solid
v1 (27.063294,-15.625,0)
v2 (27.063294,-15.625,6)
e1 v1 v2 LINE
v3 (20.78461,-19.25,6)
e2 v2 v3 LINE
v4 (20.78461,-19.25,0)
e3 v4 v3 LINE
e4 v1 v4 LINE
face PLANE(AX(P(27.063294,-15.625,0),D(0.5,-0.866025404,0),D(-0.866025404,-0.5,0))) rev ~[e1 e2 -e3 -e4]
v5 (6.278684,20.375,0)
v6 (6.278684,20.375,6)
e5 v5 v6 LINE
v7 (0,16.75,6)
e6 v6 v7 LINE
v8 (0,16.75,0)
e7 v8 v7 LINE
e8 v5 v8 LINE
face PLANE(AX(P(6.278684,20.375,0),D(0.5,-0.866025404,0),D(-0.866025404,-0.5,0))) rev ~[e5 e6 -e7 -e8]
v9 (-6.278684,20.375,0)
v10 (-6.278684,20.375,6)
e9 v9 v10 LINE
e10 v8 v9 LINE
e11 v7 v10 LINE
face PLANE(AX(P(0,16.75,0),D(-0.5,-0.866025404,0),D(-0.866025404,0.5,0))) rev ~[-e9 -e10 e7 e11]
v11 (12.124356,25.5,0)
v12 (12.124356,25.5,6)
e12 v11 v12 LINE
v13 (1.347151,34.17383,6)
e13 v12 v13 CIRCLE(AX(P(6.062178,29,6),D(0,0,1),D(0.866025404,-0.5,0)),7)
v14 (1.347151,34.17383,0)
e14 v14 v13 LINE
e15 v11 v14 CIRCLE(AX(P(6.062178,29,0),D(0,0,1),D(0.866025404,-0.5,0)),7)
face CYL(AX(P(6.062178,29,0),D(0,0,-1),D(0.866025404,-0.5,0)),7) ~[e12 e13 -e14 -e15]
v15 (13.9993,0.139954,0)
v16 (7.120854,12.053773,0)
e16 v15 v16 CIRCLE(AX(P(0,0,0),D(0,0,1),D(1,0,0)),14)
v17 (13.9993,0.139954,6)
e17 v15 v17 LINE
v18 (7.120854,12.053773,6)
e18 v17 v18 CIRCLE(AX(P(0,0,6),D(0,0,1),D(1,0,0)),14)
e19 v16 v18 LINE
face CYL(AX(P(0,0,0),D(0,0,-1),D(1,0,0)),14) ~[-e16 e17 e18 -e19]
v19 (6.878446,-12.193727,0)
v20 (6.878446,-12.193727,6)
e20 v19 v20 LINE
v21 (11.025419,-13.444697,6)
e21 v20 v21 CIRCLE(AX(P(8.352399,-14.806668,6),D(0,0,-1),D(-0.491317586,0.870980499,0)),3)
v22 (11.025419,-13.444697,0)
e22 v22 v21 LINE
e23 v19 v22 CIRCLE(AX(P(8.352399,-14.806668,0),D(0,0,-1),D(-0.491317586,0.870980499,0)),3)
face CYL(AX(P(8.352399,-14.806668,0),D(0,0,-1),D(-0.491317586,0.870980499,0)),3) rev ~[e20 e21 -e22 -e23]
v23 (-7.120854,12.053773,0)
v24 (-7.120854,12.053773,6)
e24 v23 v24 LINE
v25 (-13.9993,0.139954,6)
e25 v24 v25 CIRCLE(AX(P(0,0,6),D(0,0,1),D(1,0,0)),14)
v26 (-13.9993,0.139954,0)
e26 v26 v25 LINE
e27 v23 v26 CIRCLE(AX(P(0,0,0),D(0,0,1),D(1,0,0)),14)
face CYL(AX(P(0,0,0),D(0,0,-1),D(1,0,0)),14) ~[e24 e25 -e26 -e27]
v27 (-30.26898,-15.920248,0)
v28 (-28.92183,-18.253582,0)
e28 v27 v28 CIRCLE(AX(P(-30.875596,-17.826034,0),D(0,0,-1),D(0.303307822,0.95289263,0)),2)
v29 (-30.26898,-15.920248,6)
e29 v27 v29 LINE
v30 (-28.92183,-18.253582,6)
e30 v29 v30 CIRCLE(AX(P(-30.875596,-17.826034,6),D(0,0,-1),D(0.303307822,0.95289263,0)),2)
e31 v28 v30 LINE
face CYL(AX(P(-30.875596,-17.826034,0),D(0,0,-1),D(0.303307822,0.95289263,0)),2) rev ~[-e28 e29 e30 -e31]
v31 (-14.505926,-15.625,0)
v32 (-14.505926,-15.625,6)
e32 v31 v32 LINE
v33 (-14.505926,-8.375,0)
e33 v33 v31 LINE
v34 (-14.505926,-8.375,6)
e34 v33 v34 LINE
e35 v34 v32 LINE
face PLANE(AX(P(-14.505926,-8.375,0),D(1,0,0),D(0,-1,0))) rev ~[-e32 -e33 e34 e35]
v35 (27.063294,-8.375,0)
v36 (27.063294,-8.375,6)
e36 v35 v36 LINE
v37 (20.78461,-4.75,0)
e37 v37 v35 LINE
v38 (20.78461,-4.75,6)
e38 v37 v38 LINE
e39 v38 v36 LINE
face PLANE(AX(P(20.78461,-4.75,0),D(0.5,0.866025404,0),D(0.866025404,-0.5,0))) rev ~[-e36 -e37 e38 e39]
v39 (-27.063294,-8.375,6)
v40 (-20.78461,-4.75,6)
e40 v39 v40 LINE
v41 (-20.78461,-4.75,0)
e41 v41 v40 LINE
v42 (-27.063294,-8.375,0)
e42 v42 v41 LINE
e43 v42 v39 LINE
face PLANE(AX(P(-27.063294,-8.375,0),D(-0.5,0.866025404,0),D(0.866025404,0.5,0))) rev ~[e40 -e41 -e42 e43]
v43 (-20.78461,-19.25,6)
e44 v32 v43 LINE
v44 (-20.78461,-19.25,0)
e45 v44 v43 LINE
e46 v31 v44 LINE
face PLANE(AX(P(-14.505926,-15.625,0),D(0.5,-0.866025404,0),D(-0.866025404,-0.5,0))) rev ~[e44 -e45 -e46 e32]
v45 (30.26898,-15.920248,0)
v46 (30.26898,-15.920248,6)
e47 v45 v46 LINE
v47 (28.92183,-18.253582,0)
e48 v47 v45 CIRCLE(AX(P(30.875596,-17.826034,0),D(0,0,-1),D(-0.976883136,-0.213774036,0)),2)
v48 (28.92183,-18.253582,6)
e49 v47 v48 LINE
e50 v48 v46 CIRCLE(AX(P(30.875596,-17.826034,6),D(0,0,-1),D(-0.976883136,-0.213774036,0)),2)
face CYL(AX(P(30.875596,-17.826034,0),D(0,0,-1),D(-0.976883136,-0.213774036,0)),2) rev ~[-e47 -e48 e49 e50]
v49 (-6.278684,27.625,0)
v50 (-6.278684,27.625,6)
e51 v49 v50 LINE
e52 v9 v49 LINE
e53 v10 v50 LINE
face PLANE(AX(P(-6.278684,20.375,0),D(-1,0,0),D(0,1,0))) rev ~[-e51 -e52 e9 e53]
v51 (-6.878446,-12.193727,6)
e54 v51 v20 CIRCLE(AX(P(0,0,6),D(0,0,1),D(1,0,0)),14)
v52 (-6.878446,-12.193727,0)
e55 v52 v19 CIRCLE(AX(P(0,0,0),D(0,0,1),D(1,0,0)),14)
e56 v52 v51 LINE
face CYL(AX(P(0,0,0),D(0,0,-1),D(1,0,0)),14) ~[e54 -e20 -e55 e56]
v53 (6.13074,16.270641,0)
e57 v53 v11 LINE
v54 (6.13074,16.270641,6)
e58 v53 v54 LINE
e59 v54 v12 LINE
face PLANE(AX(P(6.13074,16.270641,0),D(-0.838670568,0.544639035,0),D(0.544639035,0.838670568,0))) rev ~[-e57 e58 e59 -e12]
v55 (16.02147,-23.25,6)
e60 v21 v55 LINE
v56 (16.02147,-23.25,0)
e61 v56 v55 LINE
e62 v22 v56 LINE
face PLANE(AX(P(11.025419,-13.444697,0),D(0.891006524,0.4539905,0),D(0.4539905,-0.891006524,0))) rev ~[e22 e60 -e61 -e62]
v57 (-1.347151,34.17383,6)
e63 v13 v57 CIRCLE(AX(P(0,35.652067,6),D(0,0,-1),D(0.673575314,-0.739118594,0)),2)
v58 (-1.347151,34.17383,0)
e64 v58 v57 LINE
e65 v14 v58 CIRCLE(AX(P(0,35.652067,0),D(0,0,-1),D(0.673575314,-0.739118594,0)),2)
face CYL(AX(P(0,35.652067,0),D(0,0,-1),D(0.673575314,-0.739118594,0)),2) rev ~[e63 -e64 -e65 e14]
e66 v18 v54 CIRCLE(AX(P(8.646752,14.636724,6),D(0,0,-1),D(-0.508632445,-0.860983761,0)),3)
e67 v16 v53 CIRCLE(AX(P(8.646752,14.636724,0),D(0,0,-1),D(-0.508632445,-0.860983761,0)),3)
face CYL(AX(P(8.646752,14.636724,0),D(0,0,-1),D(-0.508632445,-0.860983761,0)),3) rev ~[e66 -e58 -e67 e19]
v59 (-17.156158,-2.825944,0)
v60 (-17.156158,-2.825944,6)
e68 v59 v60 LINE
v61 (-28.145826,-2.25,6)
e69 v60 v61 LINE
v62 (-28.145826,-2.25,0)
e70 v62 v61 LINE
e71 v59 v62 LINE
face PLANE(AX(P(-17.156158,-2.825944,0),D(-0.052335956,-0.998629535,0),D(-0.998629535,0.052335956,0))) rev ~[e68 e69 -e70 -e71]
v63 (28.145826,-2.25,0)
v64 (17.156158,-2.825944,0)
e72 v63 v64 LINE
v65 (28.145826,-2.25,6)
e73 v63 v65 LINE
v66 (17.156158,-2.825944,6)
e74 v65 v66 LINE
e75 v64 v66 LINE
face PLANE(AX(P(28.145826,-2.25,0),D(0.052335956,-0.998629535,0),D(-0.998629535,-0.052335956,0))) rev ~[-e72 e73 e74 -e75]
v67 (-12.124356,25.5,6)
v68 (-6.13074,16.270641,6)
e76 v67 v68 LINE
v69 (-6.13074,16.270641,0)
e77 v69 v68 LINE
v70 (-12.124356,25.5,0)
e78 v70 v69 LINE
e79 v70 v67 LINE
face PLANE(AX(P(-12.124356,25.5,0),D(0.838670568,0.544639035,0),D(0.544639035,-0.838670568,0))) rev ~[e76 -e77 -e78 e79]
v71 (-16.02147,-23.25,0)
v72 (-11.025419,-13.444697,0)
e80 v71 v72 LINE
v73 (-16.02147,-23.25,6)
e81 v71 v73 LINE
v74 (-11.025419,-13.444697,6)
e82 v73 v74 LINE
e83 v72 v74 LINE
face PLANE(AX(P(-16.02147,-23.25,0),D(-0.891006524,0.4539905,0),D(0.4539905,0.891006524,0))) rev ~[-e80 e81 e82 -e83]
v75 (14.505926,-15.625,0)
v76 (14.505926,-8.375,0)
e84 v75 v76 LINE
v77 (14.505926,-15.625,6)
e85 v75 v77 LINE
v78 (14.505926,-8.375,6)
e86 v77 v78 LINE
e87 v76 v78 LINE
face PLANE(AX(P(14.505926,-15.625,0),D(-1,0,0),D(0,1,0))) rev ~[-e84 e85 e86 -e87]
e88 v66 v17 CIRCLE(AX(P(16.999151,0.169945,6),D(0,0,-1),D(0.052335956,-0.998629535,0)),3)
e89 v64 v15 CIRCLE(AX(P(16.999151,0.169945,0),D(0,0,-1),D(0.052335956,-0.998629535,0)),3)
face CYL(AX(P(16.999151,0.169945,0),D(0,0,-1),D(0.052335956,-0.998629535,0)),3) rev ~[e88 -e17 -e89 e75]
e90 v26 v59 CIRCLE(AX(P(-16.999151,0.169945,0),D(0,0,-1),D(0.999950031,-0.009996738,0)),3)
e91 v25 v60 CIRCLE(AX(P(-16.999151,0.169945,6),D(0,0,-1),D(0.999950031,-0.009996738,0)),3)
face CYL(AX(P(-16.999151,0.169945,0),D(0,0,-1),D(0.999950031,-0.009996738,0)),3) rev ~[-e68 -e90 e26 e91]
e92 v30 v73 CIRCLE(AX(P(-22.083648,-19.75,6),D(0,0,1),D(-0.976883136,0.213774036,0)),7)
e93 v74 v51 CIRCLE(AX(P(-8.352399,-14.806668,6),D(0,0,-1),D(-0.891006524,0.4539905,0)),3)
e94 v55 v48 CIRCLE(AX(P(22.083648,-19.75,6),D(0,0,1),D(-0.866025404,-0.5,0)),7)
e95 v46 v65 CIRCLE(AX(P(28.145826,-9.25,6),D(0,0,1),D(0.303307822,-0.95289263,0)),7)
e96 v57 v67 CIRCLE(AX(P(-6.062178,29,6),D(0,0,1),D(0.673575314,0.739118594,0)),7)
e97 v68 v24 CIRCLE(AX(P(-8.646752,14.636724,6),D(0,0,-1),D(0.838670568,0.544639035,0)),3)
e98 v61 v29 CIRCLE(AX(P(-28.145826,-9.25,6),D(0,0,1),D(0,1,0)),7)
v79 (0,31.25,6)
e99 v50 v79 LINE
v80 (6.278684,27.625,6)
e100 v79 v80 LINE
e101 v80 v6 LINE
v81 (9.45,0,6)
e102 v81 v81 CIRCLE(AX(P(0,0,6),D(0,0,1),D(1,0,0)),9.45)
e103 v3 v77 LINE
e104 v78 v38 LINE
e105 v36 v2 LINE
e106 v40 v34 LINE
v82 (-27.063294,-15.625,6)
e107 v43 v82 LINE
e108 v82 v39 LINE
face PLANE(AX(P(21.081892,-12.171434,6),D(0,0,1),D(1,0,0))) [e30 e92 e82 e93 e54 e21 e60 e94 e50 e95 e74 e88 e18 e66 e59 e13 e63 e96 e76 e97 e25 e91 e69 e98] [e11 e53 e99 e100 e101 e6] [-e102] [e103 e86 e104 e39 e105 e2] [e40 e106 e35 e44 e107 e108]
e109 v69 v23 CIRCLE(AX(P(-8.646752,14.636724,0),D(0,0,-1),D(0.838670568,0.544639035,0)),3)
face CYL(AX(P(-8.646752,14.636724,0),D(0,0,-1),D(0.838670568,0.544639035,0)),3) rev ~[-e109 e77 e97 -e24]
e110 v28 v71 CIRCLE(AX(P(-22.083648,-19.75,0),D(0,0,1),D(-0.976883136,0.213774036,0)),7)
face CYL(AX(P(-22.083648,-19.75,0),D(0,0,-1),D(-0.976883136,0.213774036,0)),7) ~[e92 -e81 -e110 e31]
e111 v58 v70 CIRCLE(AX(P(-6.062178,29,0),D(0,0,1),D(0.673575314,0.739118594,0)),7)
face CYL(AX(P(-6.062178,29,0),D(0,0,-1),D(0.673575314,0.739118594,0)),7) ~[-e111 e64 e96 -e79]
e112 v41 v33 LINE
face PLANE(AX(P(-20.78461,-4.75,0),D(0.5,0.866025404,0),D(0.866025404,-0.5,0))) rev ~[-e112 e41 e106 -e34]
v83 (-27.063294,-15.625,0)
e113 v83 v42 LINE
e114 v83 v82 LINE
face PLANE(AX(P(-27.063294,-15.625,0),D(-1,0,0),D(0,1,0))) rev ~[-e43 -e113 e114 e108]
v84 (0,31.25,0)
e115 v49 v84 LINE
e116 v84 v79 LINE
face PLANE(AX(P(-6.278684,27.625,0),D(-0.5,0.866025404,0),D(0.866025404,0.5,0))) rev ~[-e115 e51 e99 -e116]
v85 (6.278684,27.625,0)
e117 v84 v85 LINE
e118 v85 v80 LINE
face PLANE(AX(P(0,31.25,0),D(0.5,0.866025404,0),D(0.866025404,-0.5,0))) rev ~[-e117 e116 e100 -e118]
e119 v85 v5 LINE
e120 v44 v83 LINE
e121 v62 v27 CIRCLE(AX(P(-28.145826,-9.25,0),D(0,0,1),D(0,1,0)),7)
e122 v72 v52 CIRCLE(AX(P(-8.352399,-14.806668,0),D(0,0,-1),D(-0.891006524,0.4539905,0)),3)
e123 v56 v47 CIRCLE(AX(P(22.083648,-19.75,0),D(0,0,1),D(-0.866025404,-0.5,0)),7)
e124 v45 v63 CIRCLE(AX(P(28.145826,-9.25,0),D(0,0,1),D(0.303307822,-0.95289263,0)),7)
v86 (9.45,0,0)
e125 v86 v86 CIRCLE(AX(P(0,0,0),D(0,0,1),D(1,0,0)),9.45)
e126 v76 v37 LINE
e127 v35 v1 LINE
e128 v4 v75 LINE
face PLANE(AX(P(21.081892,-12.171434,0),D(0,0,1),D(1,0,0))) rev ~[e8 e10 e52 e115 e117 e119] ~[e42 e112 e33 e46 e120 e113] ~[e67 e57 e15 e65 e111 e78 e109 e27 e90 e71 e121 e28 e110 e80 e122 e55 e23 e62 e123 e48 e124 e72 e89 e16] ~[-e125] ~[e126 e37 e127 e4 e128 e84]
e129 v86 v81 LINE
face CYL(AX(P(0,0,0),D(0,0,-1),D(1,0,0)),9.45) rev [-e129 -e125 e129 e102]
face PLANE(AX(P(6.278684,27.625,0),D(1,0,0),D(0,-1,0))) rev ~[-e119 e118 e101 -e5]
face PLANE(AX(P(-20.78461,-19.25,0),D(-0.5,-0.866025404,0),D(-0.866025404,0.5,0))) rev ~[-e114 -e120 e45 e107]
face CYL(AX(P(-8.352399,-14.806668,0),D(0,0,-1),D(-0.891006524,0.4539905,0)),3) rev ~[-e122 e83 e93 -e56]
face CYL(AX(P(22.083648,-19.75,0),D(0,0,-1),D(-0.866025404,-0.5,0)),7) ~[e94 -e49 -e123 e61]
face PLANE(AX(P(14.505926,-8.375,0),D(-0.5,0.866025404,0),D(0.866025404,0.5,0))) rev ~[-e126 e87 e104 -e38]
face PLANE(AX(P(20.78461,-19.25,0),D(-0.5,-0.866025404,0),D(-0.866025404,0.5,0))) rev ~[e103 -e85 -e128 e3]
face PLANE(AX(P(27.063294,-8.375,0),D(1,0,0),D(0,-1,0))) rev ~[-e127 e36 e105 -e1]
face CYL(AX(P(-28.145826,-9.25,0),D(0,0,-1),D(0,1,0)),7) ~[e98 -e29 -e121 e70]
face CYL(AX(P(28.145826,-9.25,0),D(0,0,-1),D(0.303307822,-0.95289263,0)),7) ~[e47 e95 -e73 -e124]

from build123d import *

# Parameters (mm, degrees)
F0_R     = 14
F0_R_2   = 9.45
F1_DEPTH = 6
F3_DEPTH = 6


# Not quite as in the source:
# - a feature names something its author has since deleted; it is built from what else it names


with BuildPart() as f1:
    # F0 (on Top) → F1 (new body)
    with BuildSketch(Plane.XY):
        Circle(F0_R)
        Circle(F0_R_2, mode=Mode.SUBTRACT)
    extrude(amount=F1_DEPTH)

    # F2 (on Top) → F3 (join)
    with BuildSketch(Plane.XY):
        with BuildLine():
            ThreePointArc((7.1208542294, 12.0537726478), (5.7261776623, 13.9509775601), (6.1307398604, 16.2706410345))
            Line((6.1307398604, 16.2706410345), (12.124355653, 25.5))
            ThreePointArc((12.124355653, 25.5), (10.4510884103, 34.4532067527), (1.3471506281, 34.1738301594))
            ThreePointArc((1.3471506281, 34.1738301594), (0, 33.6520673478), (-1.3471506281, 34.1738301594))
            ThreePointArc((-1.3471506281, 34.1738301594), (-10.4510884103, 34.4532067527), (-12.124355653, 25.5))
            Line((-12.124355653, 25.5), (-6.1307398604, 16.2706410345))
            ThreePointArc((-6.1307398604, 16.2706410345), (-5.7261776623, 13.9509775601), (-7.1208542294, 12.0537726478))
            ThreePointArc((-7.1208542294, 12.0537726478), (0, 14), (7.1208542294, 12.0537726478))
        make_face()
        Polygon((-6.2786841774, 27.625), (0, 31.25), (6.2786841774, 27.625), (6.2786841774, 20.375), (0, 16.75), (-6.2786841774, 20.375), align=None, mode=Mode.SUBTRACT)
        with BuildLine():
            ThreePointArc((17.1561584019, -2.8259440541), (14.9449898058, -2.016473458), (13.9993004391, 0.1399543354))
            ThreePointArc((13.9993004391, 0.1399543354), (13.9998251087, 0.0699780419), (14, 0))
            ThreePointArc((14, 0), (12.0892151717, -7.0605153163), (6.8784462097, -12.1937269832))
            ThreePointArc((6.8784462097, -12.1937269832), (9.2188121436, -11.9345041022), (11.0254185415, -13.4446969803))
            Line((11.0254185415, -13.4446969803), (16.02146997, -23.25))
            ThreePointArc((16.02146997, -23.25), (24.6118080845, -26.2775114368), (28.9218297486, -18.2535817464))
            ThreePointArc((28.9218297486, -18.2535817464), (29.1435452131, -16.8260336739), (30.2689803767, -15.920248413))
            ThreePointArc((30.2689803767, -15.920248413), (35.0628964948, -8.1756953159), (28.145825623, -2.25))
            Line((28.145825623, -2.25), (17.1561584019, -2.8259440541))
        make_face()
        Polygon((27.0632938683, -15.625), (20.7846096908, -19.25), (14.5059255134, -15.625), (14.5059255134, -8.375), (20.7846096908, -4.75), (27.0632938683, -8.375), align=None, mode=Mode.SUBTRACT)
        with BuildLine():
            ThreePointArc((-6.8784462097, -12.1937269832), (-12.124355653, -7), (-13.9993004391, 0.1399543354))
            ThreePointArc((-13.9993004391, 0.1399543354), (-14.9449898058, -2.016473458), (-17.1561584019, -2.8259440541))
            Line((-17.1561584019, -2.8259440541), (-28.145825623, -2.25))
            ThreePointArc((-28.145825623, -2.25), (-35.0628964948, -8.1756953159), (-30.2689803767, -15.920248413))
            ThreePointArc((-30.2689803767, -15.920248413), (-29.1435452131, -16.8260336739), (-28.9218297486, -18.2535817464))
            ThreePointArc((-28.9218297486, -18.2535817464), (-24.6118080845, -26.2775114368), (-16.02146997, -23.25))
            Line((-16.02146997, -23.25), (-11.0254185415, -13.4446969803))
            ThreePointArc((-11.0254185415, -13.4446969803), (-9.2188121436, -11.9345041022), (-6.8784462097, -12.1937269832))
        make_face()
        Polygon((-27.0632938683, -15.625), (-27.0632938683, -8.375), (-20.7846096908, -4.75), (-14.5059255134, -8.375), (-14.5059255134, -15.625), (-20.7846096908, -19.25), align=None, mode=Mode.SUBTRACT)
    extrude(amount=F3_DEPTH)


solid = f1.part
